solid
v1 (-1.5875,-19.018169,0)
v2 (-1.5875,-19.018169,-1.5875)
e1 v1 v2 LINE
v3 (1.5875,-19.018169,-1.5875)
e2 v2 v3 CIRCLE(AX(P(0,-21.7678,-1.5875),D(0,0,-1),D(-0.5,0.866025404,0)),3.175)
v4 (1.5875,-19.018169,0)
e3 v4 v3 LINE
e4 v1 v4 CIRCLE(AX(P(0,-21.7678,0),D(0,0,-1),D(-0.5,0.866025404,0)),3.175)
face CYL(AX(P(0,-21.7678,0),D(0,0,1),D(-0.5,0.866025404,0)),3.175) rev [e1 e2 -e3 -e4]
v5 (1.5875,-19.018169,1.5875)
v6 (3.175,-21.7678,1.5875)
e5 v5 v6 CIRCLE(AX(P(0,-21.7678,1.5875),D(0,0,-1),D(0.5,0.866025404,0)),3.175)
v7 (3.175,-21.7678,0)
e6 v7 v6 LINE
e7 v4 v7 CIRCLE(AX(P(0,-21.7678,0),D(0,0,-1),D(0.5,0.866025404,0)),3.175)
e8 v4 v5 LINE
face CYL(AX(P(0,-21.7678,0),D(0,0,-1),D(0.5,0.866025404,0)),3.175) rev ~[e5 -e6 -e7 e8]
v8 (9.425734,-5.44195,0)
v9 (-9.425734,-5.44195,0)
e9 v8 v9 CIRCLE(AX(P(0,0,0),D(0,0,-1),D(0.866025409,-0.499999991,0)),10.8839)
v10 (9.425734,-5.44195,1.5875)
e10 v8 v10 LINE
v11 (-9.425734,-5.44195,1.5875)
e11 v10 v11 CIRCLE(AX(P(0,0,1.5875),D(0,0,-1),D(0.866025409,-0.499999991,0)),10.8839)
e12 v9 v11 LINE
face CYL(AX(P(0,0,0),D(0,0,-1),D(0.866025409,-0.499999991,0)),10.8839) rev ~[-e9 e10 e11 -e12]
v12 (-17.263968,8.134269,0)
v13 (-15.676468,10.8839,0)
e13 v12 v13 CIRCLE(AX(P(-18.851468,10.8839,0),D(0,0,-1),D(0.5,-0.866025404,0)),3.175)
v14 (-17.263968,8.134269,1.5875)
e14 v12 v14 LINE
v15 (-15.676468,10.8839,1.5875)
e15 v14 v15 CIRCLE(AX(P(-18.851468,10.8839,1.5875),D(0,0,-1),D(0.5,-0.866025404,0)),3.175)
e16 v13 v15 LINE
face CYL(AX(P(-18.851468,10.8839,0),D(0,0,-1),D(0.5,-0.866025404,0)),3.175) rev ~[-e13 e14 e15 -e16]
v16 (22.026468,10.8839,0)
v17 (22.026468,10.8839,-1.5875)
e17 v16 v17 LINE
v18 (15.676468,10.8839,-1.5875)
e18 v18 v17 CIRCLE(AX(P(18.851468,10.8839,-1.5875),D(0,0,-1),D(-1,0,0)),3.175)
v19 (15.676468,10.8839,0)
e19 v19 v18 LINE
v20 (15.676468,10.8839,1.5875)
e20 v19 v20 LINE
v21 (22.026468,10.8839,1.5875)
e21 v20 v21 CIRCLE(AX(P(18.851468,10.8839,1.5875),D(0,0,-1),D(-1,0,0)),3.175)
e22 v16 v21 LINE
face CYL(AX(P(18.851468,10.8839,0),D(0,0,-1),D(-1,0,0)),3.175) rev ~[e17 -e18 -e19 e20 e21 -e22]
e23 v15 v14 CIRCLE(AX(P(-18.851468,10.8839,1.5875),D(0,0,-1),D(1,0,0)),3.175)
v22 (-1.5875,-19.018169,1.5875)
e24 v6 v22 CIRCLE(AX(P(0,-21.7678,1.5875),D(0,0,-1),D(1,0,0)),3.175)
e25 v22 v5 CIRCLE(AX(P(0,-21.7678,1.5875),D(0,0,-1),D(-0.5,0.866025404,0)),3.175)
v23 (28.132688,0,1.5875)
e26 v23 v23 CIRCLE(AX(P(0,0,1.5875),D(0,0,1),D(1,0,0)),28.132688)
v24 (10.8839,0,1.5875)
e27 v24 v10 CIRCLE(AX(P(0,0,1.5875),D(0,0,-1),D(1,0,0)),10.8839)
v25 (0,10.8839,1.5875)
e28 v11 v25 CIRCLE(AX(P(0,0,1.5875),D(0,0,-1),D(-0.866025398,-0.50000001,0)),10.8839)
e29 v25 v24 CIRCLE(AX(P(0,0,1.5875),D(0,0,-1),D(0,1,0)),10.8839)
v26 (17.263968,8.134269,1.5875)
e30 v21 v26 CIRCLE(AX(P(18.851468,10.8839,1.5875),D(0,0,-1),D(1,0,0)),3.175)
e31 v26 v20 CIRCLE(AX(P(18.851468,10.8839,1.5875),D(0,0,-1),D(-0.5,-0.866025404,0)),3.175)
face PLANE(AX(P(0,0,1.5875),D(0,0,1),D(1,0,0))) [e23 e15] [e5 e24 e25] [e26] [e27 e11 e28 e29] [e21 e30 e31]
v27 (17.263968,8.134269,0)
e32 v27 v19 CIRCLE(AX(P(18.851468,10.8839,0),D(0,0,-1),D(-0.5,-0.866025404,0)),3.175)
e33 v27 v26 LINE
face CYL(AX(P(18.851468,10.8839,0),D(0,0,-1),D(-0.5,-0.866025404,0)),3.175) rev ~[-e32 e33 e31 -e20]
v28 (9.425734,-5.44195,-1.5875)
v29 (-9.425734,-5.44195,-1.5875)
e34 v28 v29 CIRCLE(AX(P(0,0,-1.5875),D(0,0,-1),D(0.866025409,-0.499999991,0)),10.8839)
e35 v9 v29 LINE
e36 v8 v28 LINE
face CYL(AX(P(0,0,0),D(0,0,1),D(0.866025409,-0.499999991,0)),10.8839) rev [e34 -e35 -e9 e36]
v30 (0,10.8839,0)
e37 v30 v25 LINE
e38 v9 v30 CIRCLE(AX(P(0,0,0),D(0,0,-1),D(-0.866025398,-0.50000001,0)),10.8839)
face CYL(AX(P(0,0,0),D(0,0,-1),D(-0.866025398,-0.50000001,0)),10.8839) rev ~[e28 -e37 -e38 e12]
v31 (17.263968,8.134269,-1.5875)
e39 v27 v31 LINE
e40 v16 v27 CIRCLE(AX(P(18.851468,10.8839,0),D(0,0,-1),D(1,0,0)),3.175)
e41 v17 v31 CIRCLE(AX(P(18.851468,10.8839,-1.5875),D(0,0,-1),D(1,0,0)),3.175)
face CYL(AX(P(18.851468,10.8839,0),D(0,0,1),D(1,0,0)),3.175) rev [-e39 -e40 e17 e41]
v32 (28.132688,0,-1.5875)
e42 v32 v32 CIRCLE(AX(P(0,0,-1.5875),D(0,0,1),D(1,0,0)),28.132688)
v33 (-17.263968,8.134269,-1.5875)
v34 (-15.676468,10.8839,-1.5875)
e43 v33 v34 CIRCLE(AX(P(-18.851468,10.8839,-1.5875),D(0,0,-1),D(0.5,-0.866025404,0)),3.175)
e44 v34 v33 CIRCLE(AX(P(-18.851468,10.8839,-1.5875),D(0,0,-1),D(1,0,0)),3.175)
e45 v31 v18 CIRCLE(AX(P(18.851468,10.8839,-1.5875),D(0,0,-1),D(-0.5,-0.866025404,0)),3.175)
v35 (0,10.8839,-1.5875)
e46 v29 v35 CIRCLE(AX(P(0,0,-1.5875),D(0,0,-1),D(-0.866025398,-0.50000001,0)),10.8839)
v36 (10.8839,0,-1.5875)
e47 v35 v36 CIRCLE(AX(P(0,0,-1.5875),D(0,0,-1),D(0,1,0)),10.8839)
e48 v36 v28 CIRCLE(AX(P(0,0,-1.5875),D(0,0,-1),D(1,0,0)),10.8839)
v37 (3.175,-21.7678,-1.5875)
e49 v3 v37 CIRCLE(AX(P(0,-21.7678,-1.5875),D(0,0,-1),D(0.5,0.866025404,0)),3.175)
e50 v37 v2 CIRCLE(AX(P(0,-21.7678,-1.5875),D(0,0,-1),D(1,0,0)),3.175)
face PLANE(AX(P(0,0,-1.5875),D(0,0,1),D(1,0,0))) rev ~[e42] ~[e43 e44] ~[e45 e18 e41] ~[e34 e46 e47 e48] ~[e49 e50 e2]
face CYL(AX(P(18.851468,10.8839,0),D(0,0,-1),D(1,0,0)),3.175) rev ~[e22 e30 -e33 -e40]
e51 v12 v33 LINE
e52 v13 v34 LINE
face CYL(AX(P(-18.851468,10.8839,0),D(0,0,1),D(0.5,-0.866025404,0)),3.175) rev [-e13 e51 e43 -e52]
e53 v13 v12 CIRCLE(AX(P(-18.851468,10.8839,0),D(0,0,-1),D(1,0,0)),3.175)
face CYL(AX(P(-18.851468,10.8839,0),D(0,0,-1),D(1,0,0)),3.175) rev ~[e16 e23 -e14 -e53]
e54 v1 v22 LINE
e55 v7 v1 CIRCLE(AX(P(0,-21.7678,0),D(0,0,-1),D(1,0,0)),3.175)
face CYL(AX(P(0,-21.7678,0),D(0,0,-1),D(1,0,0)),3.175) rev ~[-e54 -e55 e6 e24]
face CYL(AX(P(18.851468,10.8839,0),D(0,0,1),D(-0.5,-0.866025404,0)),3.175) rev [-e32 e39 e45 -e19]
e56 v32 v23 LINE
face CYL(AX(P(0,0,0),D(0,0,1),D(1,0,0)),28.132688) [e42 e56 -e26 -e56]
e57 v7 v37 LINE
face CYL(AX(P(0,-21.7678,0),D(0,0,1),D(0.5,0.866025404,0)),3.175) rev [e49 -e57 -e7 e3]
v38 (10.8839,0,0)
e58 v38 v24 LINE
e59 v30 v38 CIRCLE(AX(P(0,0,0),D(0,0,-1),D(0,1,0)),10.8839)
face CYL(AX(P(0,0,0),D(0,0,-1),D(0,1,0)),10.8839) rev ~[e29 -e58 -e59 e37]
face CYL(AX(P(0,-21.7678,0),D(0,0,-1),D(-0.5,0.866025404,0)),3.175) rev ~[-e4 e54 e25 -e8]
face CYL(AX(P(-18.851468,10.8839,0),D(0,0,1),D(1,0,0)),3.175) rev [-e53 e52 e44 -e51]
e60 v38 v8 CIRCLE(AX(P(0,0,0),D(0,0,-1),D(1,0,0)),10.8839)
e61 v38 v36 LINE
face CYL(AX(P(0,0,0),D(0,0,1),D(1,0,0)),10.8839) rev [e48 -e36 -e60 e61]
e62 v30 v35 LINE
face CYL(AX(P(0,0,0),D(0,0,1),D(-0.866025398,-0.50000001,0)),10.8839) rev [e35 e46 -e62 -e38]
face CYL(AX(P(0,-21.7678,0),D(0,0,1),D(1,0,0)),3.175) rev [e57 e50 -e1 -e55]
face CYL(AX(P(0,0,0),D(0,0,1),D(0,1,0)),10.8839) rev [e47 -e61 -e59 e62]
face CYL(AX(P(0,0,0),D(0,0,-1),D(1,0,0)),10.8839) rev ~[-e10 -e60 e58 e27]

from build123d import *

# Parameters (mm, degrees)
F0_R     = 28.1326878824
F1_DEPTH = 1.5875


with BuildPart() as f1:
    # F0 (on Top) → F1 (new body, symmetric)
    with BuildSketch(Plane.XY):
        Circle(F0_R)
        with BuildLine():
            Line((-15.6764677845, 10.8839), (0, 10.8839))
            Line((0, 10.8839), (15.6764677845, 10.8839))
            ThreePointArc((15.6764677845, 10.8839), (18.8514677845, 14.0589), (22.0264677845, 10.8839))
            ThreePointArc((22.0264677845, 10.8839), (20.4389677845, 8.134269343), (17.2639677845, 8.134269343))
            Line((17.2639677845, 8.134269343), (9.4257339481, -5.4419499033))
            Line((9.4257339481, -5.4419499033), (1.5875, -19.018169343))
            ThreePointArc((1.5875, -19.018169343), (2.749630657, -20.1803), (3.175, -21.7678))
            ThreePointArc((3.175, -21.7678), (-1.5875, -24.517430657), (-1.5875, -19.018169343))
            Line((-1.5875, -19.018169343), (-9.4257338301, -5.4419501077))
            Line((-9.4257338301, -5.4419501077), (-17.2639677845, 8.134269343))
            ThreePointArc((-17.2639677845, 8.134269343), (-21.6010984415, 12.4714), (-15.6764677845, 10.8839))
        make_face(mode=Mode.SUBTRACT)
        with BuildLine():
            ThreePointArc((0, 10.8839), (7.6960794958, 7.6960794958), (10.8839, 0))
            ThreePointArc((10.8839, 0), (10.5130401152, -2.8169605511), (9.4257339481, -5.4419499033))
            Line((9.4257339481, -5.4419499033), (17.2639677845, 8.134269343))
            ThreePointArc((17.2639677845, 8.134269343), (16.1018371275, 9.2964), (15.6764677845, 10.8839))
            Line((15.6764677845, 10.8839), (0, 10.8839))
        make_face()
        with BuildLine():
            ThreePointArc((-9.4257338301, -5.4419501077), (-9.4257339233, 5.4419499462), (0, 10.8839))
            Line((0, 10.8839), (-15.6764677845, 10.8839))
            ThreePointArc((-15.6764677845, 10.8839), (-16.1018371275, 9.2964), (-17.2639677845, 8.134269343))
            Line((-17.2639677845, 8.134269343), (-9.4257338301, -5.4419501077))
        make_face()
        with BuildLine():
            Line((1.5875, -19.018169343), (9.4257339481, -5.4419499033))
            ThreePointArc((9.4257339481, -5.4419499033), (1.18e-07, -10.8839), (-9.4257338301, -5.4419501077))
            Line((-9.4257338301, -5.4419501077), (-1.5875, -19.018169343))
            ThreePointArc((-1.5875, -19.018169343), (0, -18.5928), (1.5875, -19.018169343))
        make_face()
    extrude(amount=F1_DEPTH, both=True)


solid = f1.part
